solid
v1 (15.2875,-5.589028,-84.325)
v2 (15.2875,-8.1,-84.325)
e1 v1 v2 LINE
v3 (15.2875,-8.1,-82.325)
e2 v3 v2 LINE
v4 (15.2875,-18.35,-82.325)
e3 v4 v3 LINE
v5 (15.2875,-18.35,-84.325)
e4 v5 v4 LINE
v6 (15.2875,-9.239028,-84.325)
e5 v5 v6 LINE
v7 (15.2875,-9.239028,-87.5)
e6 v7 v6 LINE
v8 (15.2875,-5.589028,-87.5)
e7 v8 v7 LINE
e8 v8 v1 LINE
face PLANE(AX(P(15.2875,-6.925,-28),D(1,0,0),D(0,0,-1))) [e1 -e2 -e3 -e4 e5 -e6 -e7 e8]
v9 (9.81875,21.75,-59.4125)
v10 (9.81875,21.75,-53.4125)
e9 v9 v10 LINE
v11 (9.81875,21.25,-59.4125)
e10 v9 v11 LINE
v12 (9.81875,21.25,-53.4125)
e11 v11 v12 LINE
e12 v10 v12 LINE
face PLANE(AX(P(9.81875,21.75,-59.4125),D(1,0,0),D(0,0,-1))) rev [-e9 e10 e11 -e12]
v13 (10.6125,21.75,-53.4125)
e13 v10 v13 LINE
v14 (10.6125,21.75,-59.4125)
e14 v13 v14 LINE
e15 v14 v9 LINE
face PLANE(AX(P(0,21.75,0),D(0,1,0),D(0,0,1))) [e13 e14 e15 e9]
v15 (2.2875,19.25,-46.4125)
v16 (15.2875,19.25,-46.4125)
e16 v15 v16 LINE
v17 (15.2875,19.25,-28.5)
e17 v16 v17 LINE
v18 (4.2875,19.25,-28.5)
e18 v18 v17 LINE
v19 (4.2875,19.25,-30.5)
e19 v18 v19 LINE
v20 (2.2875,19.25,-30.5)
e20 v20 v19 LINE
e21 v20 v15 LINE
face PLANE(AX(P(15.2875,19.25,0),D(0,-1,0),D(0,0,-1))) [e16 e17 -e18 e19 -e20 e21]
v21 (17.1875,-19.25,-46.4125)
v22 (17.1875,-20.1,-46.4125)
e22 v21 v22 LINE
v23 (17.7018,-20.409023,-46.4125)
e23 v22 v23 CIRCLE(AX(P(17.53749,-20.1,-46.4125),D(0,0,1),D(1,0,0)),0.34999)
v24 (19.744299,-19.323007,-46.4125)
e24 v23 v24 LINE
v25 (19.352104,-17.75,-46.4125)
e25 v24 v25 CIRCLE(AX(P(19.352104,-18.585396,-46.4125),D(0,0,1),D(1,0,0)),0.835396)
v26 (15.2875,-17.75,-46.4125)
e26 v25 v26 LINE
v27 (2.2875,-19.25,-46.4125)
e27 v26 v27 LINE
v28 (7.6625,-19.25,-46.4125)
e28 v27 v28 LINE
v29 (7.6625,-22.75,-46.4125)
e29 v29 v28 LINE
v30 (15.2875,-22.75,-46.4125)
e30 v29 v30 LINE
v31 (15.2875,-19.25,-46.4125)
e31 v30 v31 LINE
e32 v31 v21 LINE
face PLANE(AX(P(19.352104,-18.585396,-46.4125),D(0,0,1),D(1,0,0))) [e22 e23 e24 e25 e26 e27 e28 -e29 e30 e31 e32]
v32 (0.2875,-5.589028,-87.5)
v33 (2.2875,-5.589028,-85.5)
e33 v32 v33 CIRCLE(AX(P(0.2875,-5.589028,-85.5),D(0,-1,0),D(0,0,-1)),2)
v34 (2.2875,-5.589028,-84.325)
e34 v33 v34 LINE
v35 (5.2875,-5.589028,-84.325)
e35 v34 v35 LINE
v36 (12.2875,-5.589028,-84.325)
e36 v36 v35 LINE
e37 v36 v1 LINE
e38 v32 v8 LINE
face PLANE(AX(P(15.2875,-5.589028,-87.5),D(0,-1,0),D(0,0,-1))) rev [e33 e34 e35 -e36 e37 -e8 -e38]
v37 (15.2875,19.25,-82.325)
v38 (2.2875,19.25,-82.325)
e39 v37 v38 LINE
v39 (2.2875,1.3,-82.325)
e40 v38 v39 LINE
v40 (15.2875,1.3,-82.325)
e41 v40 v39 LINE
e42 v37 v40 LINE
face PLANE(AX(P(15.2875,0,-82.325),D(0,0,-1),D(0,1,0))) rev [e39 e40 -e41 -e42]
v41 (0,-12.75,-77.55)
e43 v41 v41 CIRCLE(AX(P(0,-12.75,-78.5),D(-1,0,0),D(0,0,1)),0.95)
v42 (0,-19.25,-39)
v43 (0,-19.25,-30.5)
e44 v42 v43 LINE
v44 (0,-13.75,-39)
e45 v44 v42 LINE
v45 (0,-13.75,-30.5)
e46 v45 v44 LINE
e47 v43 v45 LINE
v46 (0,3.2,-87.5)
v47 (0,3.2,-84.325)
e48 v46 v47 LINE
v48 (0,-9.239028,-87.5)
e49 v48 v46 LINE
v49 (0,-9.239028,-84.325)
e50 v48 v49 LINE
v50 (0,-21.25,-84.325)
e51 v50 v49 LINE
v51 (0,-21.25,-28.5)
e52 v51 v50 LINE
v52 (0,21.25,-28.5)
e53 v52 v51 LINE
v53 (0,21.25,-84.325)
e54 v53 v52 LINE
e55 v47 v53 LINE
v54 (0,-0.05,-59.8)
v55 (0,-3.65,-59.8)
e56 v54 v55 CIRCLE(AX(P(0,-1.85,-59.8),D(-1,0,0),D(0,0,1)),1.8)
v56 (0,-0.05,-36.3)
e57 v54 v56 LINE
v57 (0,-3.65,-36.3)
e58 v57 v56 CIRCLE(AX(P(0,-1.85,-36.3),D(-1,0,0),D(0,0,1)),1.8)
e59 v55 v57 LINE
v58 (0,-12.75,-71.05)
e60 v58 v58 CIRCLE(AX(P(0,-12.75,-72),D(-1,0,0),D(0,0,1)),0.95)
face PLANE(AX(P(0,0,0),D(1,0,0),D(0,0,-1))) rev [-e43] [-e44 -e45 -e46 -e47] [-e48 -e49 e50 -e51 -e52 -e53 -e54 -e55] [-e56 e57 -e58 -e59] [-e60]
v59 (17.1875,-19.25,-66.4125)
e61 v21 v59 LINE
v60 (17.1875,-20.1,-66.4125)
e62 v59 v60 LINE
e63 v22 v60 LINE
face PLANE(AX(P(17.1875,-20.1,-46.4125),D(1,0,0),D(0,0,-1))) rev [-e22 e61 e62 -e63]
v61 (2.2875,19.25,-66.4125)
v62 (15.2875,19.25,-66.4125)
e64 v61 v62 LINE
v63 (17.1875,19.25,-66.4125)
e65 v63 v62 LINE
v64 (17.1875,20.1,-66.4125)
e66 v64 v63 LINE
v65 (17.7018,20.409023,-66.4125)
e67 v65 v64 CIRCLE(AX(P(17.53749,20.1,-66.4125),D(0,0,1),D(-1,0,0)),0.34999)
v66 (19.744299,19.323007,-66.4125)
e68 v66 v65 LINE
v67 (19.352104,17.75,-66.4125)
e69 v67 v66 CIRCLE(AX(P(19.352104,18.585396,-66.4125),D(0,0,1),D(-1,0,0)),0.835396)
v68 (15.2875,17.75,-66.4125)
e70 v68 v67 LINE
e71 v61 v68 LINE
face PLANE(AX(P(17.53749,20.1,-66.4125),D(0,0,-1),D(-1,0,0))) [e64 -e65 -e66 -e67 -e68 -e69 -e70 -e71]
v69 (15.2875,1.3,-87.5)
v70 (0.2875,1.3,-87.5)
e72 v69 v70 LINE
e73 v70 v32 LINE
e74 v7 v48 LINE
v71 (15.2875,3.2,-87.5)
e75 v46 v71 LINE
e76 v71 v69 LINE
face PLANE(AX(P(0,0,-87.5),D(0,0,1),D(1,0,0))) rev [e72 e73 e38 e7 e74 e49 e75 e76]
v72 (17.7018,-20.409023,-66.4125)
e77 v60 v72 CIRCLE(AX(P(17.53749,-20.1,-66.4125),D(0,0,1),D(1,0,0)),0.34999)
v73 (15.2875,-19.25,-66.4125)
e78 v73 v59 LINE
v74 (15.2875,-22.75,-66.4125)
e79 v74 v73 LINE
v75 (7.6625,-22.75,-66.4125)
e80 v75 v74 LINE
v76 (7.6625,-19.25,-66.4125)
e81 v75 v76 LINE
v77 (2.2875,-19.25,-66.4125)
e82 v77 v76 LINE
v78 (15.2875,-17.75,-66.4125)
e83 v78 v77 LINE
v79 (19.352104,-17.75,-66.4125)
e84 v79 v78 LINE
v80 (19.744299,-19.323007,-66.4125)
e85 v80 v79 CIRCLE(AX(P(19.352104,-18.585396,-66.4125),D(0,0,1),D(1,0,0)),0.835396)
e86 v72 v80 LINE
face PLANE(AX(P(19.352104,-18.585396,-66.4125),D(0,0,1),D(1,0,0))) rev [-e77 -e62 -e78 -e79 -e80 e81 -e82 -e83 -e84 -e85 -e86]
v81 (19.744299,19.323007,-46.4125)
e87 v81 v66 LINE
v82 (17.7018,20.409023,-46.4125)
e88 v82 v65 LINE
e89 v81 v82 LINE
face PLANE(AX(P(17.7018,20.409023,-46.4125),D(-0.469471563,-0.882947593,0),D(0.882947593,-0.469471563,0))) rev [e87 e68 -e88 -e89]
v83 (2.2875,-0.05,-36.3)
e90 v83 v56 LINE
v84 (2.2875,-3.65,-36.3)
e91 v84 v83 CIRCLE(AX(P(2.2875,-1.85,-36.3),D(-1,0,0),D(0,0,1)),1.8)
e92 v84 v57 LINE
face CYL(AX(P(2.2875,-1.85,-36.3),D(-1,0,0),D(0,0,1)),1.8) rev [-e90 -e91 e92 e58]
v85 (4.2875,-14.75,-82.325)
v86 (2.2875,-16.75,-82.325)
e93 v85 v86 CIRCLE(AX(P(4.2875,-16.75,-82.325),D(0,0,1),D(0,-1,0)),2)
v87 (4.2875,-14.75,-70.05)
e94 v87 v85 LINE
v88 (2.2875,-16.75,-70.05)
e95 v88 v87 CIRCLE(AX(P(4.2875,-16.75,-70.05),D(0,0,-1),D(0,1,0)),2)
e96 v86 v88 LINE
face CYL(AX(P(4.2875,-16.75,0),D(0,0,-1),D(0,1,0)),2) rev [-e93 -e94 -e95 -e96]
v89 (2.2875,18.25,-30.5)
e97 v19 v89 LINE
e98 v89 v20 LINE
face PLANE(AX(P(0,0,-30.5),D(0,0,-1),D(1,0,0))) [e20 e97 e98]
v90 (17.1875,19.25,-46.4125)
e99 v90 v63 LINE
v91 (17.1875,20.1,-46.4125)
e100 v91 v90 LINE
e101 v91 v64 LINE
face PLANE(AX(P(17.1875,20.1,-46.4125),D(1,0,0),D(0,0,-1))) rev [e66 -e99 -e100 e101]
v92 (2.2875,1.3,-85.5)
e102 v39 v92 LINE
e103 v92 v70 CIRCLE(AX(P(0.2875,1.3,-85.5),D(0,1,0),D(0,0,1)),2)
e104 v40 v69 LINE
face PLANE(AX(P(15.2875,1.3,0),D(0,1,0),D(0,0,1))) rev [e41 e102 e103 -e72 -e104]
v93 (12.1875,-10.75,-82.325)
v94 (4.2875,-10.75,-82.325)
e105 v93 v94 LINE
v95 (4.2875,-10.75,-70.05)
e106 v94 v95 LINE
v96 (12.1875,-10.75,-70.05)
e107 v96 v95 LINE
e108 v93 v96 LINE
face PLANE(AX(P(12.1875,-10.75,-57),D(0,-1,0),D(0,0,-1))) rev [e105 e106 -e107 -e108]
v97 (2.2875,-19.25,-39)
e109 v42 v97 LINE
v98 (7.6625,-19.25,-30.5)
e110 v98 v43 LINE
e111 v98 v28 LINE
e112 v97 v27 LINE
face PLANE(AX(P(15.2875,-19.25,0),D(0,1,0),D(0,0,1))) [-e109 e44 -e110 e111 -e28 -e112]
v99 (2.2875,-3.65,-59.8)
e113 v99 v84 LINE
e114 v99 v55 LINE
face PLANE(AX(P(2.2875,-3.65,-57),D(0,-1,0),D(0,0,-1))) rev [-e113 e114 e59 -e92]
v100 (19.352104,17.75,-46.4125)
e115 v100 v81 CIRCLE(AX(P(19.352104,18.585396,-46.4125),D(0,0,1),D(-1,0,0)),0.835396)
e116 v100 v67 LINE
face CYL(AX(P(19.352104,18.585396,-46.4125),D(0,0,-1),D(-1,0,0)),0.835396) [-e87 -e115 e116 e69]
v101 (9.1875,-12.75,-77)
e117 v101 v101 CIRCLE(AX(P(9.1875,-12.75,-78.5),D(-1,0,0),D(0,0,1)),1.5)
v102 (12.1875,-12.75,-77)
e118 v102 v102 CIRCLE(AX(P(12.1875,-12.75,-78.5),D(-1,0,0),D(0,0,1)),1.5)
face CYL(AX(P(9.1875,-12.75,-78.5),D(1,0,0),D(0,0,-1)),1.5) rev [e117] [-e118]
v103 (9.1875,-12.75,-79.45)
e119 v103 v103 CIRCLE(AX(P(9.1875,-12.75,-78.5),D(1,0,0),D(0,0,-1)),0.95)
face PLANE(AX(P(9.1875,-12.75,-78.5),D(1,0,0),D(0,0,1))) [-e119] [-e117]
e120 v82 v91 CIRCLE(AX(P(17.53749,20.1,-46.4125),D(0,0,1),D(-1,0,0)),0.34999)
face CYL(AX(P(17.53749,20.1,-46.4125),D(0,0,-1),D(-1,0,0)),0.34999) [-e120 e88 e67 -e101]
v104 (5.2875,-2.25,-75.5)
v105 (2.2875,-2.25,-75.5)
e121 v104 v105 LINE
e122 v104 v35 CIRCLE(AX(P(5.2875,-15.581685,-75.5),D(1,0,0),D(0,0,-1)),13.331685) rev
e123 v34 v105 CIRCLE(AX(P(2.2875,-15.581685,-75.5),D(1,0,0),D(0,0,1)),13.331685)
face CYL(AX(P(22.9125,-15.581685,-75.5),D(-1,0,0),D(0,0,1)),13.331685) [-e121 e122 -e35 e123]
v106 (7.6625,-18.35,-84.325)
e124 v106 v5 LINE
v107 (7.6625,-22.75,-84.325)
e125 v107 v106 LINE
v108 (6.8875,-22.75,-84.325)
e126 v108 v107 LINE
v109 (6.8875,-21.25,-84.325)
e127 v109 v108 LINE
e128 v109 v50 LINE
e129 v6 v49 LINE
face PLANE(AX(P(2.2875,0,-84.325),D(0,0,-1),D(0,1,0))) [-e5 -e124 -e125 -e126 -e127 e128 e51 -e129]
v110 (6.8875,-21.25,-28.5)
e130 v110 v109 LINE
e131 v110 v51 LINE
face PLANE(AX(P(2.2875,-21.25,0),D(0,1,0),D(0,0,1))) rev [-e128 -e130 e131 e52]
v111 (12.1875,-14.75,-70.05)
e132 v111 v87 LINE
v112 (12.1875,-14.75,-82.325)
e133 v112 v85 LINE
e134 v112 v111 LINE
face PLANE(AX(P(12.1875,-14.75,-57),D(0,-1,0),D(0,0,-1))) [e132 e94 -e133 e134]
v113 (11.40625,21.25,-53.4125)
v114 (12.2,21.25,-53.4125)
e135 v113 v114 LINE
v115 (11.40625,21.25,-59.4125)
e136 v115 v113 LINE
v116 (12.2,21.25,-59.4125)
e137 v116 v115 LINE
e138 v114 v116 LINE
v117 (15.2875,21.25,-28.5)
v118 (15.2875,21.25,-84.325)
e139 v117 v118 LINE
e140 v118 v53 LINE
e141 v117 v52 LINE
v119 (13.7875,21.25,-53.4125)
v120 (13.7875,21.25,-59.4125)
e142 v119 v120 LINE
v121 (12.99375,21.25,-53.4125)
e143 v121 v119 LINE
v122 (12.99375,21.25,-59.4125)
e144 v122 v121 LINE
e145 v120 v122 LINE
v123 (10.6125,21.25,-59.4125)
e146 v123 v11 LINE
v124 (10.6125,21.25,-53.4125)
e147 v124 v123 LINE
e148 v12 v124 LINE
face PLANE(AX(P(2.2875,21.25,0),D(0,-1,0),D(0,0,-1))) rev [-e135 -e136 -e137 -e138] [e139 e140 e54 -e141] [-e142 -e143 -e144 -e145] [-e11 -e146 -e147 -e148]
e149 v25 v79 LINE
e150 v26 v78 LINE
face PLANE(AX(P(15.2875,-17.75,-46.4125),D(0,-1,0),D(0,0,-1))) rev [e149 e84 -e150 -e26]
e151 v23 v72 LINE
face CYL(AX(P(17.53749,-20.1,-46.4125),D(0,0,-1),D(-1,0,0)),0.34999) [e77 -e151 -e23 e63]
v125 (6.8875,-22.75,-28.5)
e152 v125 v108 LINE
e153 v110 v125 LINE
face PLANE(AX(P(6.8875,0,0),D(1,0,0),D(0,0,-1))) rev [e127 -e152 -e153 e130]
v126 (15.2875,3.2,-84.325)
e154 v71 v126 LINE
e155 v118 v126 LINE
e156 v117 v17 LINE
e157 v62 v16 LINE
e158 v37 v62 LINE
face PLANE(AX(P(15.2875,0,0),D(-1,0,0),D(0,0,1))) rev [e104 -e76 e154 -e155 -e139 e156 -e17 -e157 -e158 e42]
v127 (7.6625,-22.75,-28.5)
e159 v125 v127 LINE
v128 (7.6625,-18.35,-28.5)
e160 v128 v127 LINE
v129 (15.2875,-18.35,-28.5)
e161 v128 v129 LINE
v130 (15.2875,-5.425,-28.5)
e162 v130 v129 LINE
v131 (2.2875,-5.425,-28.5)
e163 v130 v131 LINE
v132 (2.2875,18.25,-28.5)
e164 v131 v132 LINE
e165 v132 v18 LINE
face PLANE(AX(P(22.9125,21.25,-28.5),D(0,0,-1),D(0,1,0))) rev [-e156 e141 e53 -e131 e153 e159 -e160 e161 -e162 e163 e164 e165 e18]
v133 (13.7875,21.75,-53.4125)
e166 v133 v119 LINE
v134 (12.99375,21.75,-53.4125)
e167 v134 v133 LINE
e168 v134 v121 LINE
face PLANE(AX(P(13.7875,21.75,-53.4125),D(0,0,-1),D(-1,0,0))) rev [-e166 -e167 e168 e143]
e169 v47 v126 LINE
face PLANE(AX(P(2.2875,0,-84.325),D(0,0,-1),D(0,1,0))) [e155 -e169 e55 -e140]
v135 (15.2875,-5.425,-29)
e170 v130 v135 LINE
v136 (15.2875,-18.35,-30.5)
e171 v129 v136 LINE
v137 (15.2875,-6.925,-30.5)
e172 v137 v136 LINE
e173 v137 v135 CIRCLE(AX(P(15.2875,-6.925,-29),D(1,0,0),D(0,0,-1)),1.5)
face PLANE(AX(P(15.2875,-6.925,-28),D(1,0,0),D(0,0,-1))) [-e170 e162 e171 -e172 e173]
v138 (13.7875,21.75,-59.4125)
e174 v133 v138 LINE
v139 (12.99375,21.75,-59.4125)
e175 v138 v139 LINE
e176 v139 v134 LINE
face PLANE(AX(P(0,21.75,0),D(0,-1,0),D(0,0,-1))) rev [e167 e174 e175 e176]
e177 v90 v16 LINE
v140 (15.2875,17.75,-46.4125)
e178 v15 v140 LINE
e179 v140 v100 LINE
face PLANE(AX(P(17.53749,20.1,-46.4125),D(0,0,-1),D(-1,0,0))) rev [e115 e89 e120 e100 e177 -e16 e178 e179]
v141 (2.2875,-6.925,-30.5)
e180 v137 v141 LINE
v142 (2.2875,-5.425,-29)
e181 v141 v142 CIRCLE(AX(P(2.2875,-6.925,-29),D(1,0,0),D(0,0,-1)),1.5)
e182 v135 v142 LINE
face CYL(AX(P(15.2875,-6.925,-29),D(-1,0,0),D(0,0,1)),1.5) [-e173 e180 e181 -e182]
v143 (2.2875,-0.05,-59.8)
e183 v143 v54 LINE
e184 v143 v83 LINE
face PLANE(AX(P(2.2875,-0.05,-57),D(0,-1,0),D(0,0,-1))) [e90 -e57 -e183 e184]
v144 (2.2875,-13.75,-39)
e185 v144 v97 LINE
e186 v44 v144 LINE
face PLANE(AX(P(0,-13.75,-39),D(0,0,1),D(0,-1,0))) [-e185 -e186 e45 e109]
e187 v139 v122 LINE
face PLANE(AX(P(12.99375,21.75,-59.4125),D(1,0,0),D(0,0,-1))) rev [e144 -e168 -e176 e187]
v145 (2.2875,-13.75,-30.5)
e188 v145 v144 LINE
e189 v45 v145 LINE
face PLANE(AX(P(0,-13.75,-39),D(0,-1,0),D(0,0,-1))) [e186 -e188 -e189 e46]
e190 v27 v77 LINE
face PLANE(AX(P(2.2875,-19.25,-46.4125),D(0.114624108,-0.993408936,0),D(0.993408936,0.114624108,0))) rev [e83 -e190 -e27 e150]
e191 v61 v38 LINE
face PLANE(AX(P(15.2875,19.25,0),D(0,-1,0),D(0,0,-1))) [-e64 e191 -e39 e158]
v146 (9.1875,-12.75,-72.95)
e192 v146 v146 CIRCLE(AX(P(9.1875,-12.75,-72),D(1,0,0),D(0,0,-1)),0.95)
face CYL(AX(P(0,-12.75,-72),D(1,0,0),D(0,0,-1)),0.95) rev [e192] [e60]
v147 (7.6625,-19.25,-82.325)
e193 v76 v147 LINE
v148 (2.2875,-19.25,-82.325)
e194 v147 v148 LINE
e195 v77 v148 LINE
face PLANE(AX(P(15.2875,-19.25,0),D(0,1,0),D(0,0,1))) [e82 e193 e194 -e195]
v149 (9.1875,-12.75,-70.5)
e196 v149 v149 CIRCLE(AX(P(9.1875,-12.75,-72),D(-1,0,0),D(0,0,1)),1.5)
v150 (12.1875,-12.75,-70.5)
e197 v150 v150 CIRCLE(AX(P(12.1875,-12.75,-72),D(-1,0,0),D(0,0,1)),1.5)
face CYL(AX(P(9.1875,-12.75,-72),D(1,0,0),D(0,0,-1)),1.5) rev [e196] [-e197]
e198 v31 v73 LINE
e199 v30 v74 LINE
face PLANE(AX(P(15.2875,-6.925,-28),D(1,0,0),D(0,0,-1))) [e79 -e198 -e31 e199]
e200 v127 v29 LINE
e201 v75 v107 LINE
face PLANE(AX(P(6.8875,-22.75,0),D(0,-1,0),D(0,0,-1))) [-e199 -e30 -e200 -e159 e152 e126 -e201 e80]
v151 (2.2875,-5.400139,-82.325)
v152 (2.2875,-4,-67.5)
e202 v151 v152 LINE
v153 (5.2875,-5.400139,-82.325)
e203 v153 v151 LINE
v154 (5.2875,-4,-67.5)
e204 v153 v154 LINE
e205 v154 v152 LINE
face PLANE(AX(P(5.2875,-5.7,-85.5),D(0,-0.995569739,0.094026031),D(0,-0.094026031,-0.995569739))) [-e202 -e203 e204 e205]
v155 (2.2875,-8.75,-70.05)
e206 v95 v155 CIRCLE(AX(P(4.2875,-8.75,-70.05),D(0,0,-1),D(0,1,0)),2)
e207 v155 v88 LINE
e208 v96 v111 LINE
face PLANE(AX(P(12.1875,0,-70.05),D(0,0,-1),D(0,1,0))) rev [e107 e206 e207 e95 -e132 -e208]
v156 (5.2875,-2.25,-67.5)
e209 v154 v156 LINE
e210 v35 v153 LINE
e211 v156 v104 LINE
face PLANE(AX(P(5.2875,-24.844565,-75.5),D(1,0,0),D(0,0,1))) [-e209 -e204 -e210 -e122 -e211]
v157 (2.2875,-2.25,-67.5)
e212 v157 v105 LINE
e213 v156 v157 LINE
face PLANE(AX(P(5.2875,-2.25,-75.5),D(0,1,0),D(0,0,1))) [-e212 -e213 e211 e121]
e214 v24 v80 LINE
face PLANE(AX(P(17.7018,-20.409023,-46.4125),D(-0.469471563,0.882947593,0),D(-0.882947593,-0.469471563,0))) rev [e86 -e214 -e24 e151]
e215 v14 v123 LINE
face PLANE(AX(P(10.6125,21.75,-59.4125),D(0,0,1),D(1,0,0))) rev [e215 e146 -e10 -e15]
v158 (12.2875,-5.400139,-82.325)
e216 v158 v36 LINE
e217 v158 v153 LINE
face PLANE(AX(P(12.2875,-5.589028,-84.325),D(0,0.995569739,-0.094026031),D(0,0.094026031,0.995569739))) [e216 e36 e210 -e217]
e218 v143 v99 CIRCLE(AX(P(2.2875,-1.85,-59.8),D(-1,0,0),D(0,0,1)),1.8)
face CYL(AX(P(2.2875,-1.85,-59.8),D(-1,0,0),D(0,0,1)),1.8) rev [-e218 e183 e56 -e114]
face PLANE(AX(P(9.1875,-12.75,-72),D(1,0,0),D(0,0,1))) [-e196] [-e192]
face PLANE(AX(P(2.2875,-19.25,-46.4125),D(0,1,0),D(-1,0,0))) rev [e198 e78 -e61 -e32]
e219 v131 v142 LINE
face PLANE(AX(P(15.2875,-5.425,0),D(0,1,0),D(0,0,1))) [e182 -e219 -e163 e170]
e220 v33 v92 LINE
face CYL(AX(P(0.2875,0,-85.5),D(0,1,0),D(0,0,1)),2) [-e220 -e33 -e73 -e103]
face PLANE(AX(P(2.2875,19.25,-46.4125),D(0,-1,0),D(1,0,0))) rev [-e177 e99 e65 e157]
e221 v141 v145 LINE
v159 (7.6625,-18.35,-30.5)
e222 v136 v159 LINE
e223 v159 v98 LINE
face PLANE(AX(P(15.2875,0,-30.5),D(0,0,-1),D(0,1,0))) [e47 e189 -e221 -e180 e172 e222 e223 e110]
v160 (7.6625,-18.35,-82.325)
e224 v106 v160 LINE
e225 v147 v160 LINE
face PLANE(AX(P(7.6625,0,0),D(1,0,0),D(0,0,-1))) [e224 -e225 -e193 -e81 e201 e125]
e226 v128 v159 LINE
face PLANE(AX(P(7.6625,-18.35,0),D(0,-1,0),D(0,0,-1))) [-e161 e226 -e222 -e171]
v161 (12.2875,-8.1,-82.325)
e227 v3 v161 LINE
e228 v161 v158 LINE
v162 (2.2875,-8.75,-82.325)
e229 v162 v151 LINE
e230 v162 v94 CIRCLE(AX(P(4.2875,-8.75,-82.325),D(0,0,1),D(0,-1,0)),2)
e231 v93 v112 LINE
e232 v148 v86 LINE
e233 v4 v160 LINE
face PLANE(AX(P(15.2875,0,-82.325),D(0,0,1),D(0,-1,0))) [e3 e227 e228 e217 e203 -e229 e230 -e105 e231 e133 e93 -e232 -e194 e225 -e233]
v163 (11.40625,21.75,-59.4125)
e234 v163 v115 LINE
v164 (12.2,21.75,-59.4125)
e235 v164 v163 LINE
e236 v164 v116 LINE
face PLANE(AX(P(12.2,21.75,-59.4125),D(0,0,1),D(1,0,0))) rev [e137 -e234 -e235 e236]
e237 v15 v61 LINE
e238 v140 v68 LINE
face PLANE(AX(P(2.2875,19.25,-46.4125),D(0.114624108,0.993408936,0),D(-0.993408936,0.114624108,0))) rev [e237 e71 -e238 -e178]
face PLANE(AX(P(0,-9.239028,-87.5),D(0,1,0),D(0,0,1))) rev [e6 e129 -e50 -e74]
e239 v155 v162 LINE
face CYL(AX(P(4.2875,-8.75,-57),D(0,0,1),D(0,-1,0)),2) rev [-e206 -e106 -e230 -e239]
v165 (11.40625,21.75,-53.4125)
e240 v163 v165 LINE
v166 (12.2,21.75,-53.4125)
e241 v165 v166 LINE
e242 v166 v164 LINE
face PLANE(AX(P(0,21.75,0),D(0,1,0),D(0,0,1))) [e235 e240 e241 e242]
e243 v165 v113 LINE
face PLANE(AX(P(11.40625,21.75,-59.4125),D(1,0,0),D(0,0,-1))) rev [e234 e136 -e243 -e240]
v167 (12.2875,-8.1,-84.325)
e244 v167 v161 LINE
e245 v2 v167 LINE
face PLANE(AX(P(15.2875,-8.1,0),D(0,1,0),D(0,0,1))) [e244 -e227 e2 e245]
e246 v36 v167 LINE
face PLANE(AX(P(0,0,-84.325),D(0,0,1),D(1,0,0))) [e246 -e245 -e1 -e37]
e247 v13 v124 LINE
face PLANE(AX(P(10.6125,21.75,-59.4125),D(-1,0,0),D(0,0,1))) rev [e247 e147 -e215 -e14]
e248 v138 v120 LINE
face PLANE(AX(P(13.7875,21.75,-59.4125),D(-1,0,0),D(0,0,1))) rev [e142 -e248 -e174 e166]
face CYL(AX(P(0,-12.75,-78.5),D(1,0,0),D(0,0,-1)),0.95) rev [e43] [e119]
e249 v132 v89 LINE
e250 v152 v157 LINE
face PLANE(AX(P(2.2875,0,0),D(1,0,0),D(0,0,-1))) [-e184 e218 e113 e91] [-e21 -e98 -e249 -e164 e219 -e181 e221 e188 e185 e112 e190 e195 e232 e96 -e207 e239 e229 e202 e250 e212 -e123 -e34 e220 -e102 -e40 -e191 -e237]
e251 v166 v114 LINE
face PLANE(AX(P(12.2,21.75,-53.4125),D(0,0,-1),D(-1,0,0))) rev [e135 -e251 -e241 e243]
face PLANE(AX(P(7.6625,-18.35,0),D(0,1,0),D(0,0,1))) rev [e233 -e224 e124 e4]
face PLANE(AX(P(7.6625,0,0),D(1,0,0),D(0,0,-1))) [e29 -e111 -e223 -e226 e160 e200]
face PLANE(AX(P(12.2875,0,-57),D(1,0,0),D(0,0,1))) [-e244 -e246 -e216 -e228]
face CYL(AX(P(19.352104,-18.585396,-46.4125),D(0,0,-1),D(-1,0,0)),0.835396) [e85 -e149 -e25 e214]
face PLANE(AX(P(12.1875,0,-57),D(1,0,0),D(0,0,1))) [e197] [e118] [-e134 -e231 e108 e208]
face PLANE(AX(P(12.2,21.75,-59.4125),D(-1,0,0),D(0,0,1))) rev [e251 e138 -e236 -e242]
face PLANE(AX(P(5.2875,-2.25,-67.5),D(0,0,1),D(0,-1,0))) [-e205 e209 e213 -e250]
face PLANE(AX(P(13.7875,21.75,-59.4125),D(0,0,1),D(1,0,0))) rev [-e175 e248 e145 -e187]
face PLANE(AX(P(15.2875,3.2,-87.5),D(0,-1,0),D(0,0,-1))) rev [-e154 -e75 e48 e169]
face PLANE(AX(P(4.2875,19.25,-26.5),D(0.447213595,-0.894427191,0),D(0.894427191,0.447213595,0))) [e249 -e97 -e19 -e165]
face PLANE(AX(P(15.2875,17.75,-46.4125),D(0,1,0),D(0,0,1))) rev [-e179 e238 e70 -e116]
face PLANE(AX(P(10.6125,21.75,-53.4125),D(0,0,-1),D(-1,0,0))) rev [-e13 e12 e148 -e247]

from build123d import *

# Parameters (mm, degrees)
MAIN_EXTRUDE_DEPTH            = 2.2875
WALLS_START                   = 2.2875
WALLS_DEPTH                   = 13
CORNER_SUPPORT_DEPTH          = 2
SKETCH2_R                     = 0.95
SKETCH2_W                     = 2.4
SKETCH2_H                     = 4
SKETCH2_W_2                   = 1
SWITCH_SPACER_DEPTH           = 9.9
ARM_SUPPORT_EXTRUDE_DEPTH     = 3
ARM_SUPPORT_CURVE_DEPTH       = 40.380356778
FILLET4_R                     = 2
FILLET3_R                     = 2
SKETCH2_5_R                   = 0.95
SWITCH_MOUNT_HOLES_DEPTH      = 40.380356889
SKETCH35_R                    = 1.5
SWITCH_MOUNT_EXIT_HOLES_DEPTH = 3
SKETCH4_W                     = 8.5
SKETCH4_H                     = 5.5
WIRE_HOLE_DEPTH               = 40.380356889
SKETCH25_W                    = 6
SKETCH25_H                    = 1.35
FEMALE_SNAP_DEPTH             = 10.125
SKETCH5_W                     = 30
SKETCH5_H                     = 12.75
SERVO_HOLE_DEPTH              = 40.380356889
MAGNET_EXTRUDE_1_DEPTH        = 7.625
MAGNET_EXTRUDE_1_DEPTH_BACK   = 8.2
SKETCH30_W                    = 15.7875
SKETCH30_H                    = 0.9
SKETCH30_W_2                  = 17.7875
SKETCH30_H_2                  = 1.5
SKETCH29_R                    = 7.7
MAGNET_HOLE_DEPTH             = 2.1
SKETCH31_R                    = 5.5
MAGNET_THRU_HOLE_DEPTH        = 58.632218961
SKETCH39_W                    = 3.175
SKETCH39_H                    = 12.55
CUT_EXTRUDE1_DEPTH            = 45.416158798
CUT_EXTRUDE2_DEPTH            = 42.895144408
BOSS_EXTRUDE2_DEPTH           = 10
MIRROR1_OUTLINE_W             = 42.5
MIRROR1_OUTLINE_H             = 55.825
MIRROR1_OUTLINE_W_2           = 5.5
MIRROR1_OUTLINE_H_2           = 8.5
MIRROR1_OUTLINE_R             = 0.95
MIRROR1_DEPTH                 = 2.2875
MIRROR1_START                 = 2.2875
MIRROR1_2_DEPTH               = 13
MIRROR1_3_OUTLINE_W           = 4
MIRROR1_3_OUTLINE_H           = 12.275
MIRROR1_3_OUTLINE_R           = 1.5
MIRROR1_3_DEPTH               = 9.9
MIRROR1_4_OUTLINE_R           = 1.5
MIRROR1_4_OUTLINE_R_2         = 0.95
MIRROR1_4_DEPTH               = 3
MIRROR1_START_2               = 5.2875
MIRROR1_5_OUTLINE_R           = 1.5
MIRROR1_5_OUTLINE_R_2         = 0.95
MIRROR1_5_DEPTH               = 3.9
MIRROR1_START_3               = 12.1875
MIRROR1_6_DEPTH               = 0.1
MIRROR1_START_4               = -84.325
MIRROR1_7_DEPTH               = 14.275
MIRROR1_START_5               = -30.5
MIRROR1_8_DEPTH               = 2
SKETCH6_W                     = 59
SKETCH6_H                     = 44
MIRROR_CUT_DEPTH              = 91.295353043
MALE_SNAP_DEPTH               = 10
SKETCH34_W                    = 55.825
SKETCH34_H                    = 1.5
MAGNET_EXTRUDE_DEPTH          = 8.4
SKETCH34_5_W                  = 15.9125
SKETCH34_5_H                  = 0.9
SKETCH34_5_W_2                = 17.9125
SKETCH34_5_H_2                = 1.5
MAGNET_BOTTOM_CUT_DEPTH       = 7.625
SKETCH36_W                    = 0.79375
SKETCH36_H                    = 6
BOSS_EXTRUDE1_DEPTH           = 0.5
BOSS_EXTRUDE5_DEPTH           = 3.175
FILLET7_R                     = 2


with BuildPart() as part:
    # Sketch1 → Main Extrude (new body)
    with BuildSketch(Plane(origin=(0, 0, 0), x_dir=(0, 0, -1), z_dir=(1, 0, 0))):
        Polygon((-30.5, -9.35), (-27.325, -9.35), (-27.325, -21.25), (28.5, -21.25), (28.5, 21.25), (-27.325, 21.25), (-27.325, 3.2), (-30.5, 3.2), align=None)
        with BuildLine():
            Line((20.7, -3.65), (-2.8, -3.65))
            ThreePointArc((-2.8, -3.65), (-4.6, -1.85), (-2.8, -0.05))
            Line((-2.8, -0.05), (20.7, -0.05))
            ThreePointArc((20.7, -0.05), (22.5, -1.85), (20.7, -3.65))
        make_face(mode=Mode.SUBTRACT)
    extrude(amount=MAIN_EXTRUDE_DEPTH)

    # Sketch1<3> → Walls (add)
    with BuildSketch(Plane(origin=(0, 0, 0), x_dir=(0, 0, -1), z_dir=(1, 0, 0)).offset(WALLS_START)):
        Polygon((-25.325, 19.25), (28.5, 19.25), (28.5, 21.25), (-27.325, 21.25), (-27.325, 3.2), (-30.5, 3.2), (-30.5, 1.3), (-25.325, 1.3), align=None)
        with BuildLine():
            Line((28.5, -5.425), (28, -5.425))
            ThreePointArc((28, -5.425), (26.939339828, -5.864339828), (26.5, -6.925))
            Line((26.5, -6.925), (26.5, -19.25))
            Line((26.5, -19.25), (-25.325, -19.25))
            Line((-25.325, -19.25), (-25.325, -8.1))
            Line((-25.325, -8.1), (-28.5, -8.1))
            Line((-28.5, -8.1), (-28.5, -4.45))
            Line((-28.5, -4.45), (-30.5, -4.45))
            Line((-30.5, -4.45), (-30.5, -9.35))
            Line((-30.5, -9.35), (-27.325, -9.35))
            Line((-27.325, -9.35), (-27.325, -21.25))
            Line((-27.325, -21.25), (28.5, -21.25))
            Line((28.5, -21.25), (28.5, -5.425))
        make_face()
    extrude(amount=WALLS_DEPTH)

    # Sketch22 → Corner Support (add)
    with BuildSketch(Plane(origin=(0, 0, -28.5), x_dir=(-1, 0, 0), z_dir=(0, 0, -1))):
        Polygon((-4.2875, 19.25), (-2.2875, 18.25), (-2.2875, 19.25), align=None)
    extrude(amount=-CORNER_SUPPORT_DEPTH)

    # Sketch2 → Switch Spacer (add)
    # profile 1 of 7: a face of its own
    with BuildSketch(Plane(origin=(2.2875, 0, 0), x_dir=(0, 0, -1), z_dir=(1, 0, 0))):
        Polygon((-14.05, -10.75), (-17.05, -10.75), (-17.05, -14.75), (-14.05, -14.75), (-14.05, -12.75), align=None)
        with Locations((-15, -12.75)):
            Circle(SKETCH2_R, mode=Mode.SUBTRACT)
    # profile 2 of 7: a face of its own
    with BuildSketch(Plane(origin=(2.2875, 0, 0), x_dir=(0, 0, -1), z_dir=(1, 0, 0))):
        with Locations((-15, -12.75)):
            Circle(SKETCH2_R)
    # profile 3 of 7: a face of its own
    with BuildSketch(Plane(origin=(2.2875, 0, 0), x_dir=(0, 0, -1), z_dir=(1, 0, 0))):
        Polygon((-19.45, -10.75), (-22.45, -10.75), (-22.45, -12.75), (-22.45, -14.75), (-19.45, -14.75), align=None)
        with BuildLine():
            ThreePointArc((-20.55, -12.75), (-21.5, -13.7), (-22.45, -12.75))
            ThreePointArc((-22.45, -12.75), (-21.5, -11.8), (-20.55, -12.75))
        make_face(mode=Mode.SUBTRACT)
    # profile 4 of 7: a face of its own
    with BuildSketch(Plane(origin=(2.2875, 0, 0), x_dir=(0, 0, -1), z_dir=(1, 0, 0))):
        with Locations((-21.5, -12.75)):
            Circle(SKETCH2_R)
    # profile 5 of 7: a face of its own
    with BuildSketch(Plane(origin=(2.2875, 0, 0), x_dir=(0, 0, -1), z_dir=(1, 0, 0))):
        Polygon((-22.45, -12.75), (-22.45, -10.75), (-25.325, -10.75), (-25.325, -14.75), (-22.45, -14.75), align=None)
    # profile 6 of 7: a face of its own
    with BuildSketch(Plane(origin=(2.2875, 0, 0), x_dir=(0, 0, -1), z_dir=(1, 0, 0))):
        with Locations((-18.25, -12.75)):
            Rectangle(SKETCH2_W, SKETCH2_H)
    # profile 7 of 7: a face of its own
    with BuildSketch(Plane(origin=(2.2875, 0, 0), x_dir=(0, 0, -1), z_dir=(1, 0, 0))):
        with Locations((-13.55, -12.75)):
            Rectangle(SKETCH2_W_2, SKETCH2_H)
    extrude(amount=SWITCH_SPACER_DEPTH)

    # Sketch3 → Arm Support Extrude (add)
    with BuildSketch(Plane(origin=(2.2875, 0, 0), x_dir=(0, 0, -1), z_dir=(1, 0, 0))):
        with BuildLine():
            Line((-18.5, -2.25), (-10.5, -2.25))
            Line((-10.5, -2.25), (-10.5, -4))
            Line((-10.5, -4), (-28.5, -5.7))
            Line((-28.5, -5.7), (-30.5, -5.7))
            ThreePointArc((-30.5, -5.7), (-24.743046131, -3.129622151), (-18.5, -2.25))
        make_face()
    extrude(amount=ARM_SUPPORT_EXTRUDE_DEPTH)

    # Sketch7 → Arm Support Curve (cut, through all)
    with BuildSketch(Plane(origin=(2.2875, 0, 0), x_dir=(0, 0, -1), z_dir=(1, 0, 0))):
        with BuildLine():
            Line((-28.5, -4.583410824), (-28.5, -4.45))
            Line((-28.5, -4.45), (-30.5, -4.45))
            Line((-30.5, -4.45), (-30.5, -5.7))
            ThreePointArc((-30.5, -5.7), (-29.627655409, -5.180138898), (-28.73283292, -4.7))
            ThreePointArc((-28.73283292, -4.7), (-28.616584416, -4.641369997), (-28.5, -4.583410824))
        make_face()
    extrude(amount=ARM_SUPPORT_CURVE_DEPTH, mode=Mode.SUBTRACT)

    # Fillet4
    fillet4_edges = [part.edges().sort_by_distance(p)[0] for p in [
        (2.2875, -2.2, 30.5),
    ]]
    fillet(fillet4_edges, radius=FILLET4_R)

    # Fillet3
    fillet3_edges = [part.edges().sort_by_distance(p)[0] for p in [
        (2.2875, -14.75, 19.1875),
        (2.2875, -10.75, 19.1875),
    ]]
    fillet(fillet3_edges, radius=FILLET3_R)

    # Sketch2<5> → Switch Mount Holes (cut, symmetric)
    with BuildSketch(Plane(origin=(2.2875, 0, 0), x_dir=(0, 0, -1), z_dir=(1, 0, 0))):
        with Locations((-21.5, -12.75)):
            Circle(SKETCH2_5_R)
        with Locations((-15, -12.75)):
            Circle(SKETCH2_5_R)
    extrude(amount=SWITCH_MOUNT_HOLES_DEPTH, both=True, mode=Mode.SUBTRACT)

    # Sketch35 → Switch Mount Exit Holes (cut)
    with BuildSketch(Plane(origin=(12.1875, 0, 0), x_dir=(0, 0, -1), z_dir=(1, 0, 0))):
        with Locations((-21.5, -12.75)):
            Circle(SKETCH35_R)
        with Locations((-15, -12.75)):
            Circle(SKETCH35_R)
    extrude(amount=-SWITCH_MOUNT_EXIT_HOLES_DEPTH, mode=Mode.SUBTRACT)

    # Sketch4 → Wire Hole (cut, through all)
    with BuildSketch(Plane(origin=(2.2875, 0, 0), x_dir=(0, 0, -1), z_dir=(1, 0, 0))):
        with Locations((22.25, -16.5)):
            Rectangle(SKETCH4_W, SKETCH4_H)
    extrude(amount=-WIRE_HOLE_DEPTH, mode=Mode.SUBTRACT)

    # Sketch25 → Female Snap (cut, symmetric)
    with BuildSketch(Plane(origin=(0, 0, -0.5875), x_dir=(-1, 0, 0), z_dir=(0, 0, -1))):
        with Locations((-11.0375, -19.925)):
            Rectangle(SKETCH25_W, SKETCH25_H)
        Polygon((-15.2875, -19.25), (-15.2875, -19.91463679), (-14.0375, -19.25), align=None)
        with Locations((-11.0375, 19.925)):
            Rectangle(SKETCH25_W, SKETCH25_H)
        Polygon((-15.2875, 19.91463679), (-15.2875, 19.25), (-14.0375, 19.25), align=None)
    extrude(amount=FEMALE_SNAP_DEPTH, both=True, mode=Mode.SUBTRACT)

    # Sketch5 → Servo Hole (cut, through all)
    with BuildSketch(Plane(origin=(2.2875, 0, 0), x_dir=(0, 0, -1), z_dir=(1, 0, 0))):
        with Locations((7.35, 9.675)):
            Rectangle(SKETCH5_W, SKETCH5_H)
        with BuildLine():
            Line((-8.75, 10.675), (-8.75, 8.675))
            ThreePointArc((-8.75, 8.675), (-10.3, 7.125), (-11.85, 8.675))
            Line((-11.85, 8.675), (-11.85, 10.675))
            ThreePointArc((-11.85, 10.675), (-10.3, 12.225), (-8.75, 10.675))
        make_face()
        with BuildLine():
            Line((26.55, 10.675), (26.55, 8.675))
            ThreePointArc((26.55, 8.675), (25, 7.125), (23.45, 8.675))
            Line((23.45, 8.675), (23.45, 10.675))
            ThreePointArc((23.45, 10.675), (25, 12.225), (26.55, 10.675))
        make_face()
    extrude(amount=-SERVO_HOLE_DEPTH, mode=Mode.SUBTRACT)

    # Sketch30 → Magnet Extrude 1 (add, two sides: drawn at the far end of the back side and taken through both)
    with BuildSketch(Plane(origin=(15.2875, 0, 0), x_dir=(0, 0, -1), z_dir=(1, 0, 0)).offset(-MAGNET_EXTRUDE_1_DEPTH_BACK)):
        Polygon((-27.325, -18.35), (-27.325, -21.25), (-9.5375, -21.25), (-9.5375, -19.91463679), (-9.5375, -19.25), (-25.325, -19.25), (-25.325, -18.35), align=None)
        with Locations((-17.43125, -18.8)):
            Rectangle(SKETCH30_W, SKETCH30_H)
        with Locations((19.60625, -22)):
            Rectangle(SKETCH30_W_2, SKETCH30_H_2)
        Polygon((10.7125, -19.91463679), (10.7125, -21.25), (28.5, -21.25), (28.5, -18.35), (26.5, -18.35), (26.5, -19.25), (10.7125, -19.25), align=None)
        with Locations((-18.43125, -22)):
            Rectangle(SKETCH30_W_2, SKETCH30_H_2)
        with Locations((18.60625, -18.8)):
            Rectangle(SKETCH30_W, SKETCH30_H)
    extrude(amount=MAGNET_EXTRUDE_1_DEPTH + MAGNET_EXTRUDE_1_DEPTH_BACK)

    # Sketch29 → Magnet Hole (cut)
    with BuildSketch(Plane(origin=(0, -21.95, 0), x_dir=(1, 0, 0), z_dir=(0, 1, 0))):
        with Locations((15.2875, -17.625)):
            Circle(SKETCH29_R)
        with BuildLine():
            ThreePointArc((22.9125, -18.697089082), (20.338980677, -23.436414885), (15.2875, -25.325))
            Line((15.2875, -25.325), (22.9125, -25.325))
            Line((22.9125, -25.325), (22.9125, -18.697089082))
        make_face()
        with BuildLine():
            Line((22.9125, -9.925), (15.2875, -9.925))
            ThreePointArc((15.2875, -9.925), (20.338980677, -11.813585115), (22.9125, -16.552910918))
            Line((22.9125, -16.552910918), (22.9125, -9.925))
        make_face()
        with Locations((15.2875, 19.4)):
            Circle(SKETCH29_R)
        with BuildLine():
            ThreePointArc((22.9125, 18.327910918), (20.338980677, 13.588585115), (15.2875, 11.7))
            Line((15.2875, 11.7), (22.9125, 11.7))
            Line((22.9125, 11.7), (22.9125, 18.327910918))
        make_face()
        with BuildLine():
            Line((22.9125, 27.1), (15.2875, 27.1))
            ThreePointArc((15.2875, 27.1), (20.338980677, 25.211414885), (22.9125, 20.472089082))
            Line((22.9125, 20.472089082), (22.9125, 27.1))
        make_face()
        with BuildLine():
            ThreePointArc((22.9875, -17.625), (22.968727116, -17.087645368), (22.9125, -16.552910918))
            Line((22.9125, -16.552910918), (22.9125, -18.697089082))
            ThreePointArc((22.9125, -18.697089082), (22.968727116, -18.162354632), (22.9875, -17.625))
        make_face()
        with BuildLine():
            Line((22.9125, 20.472089082), (22.9125, 18.327910918))
            ThreePointArc((22.9125, 18.327910918), (22.968727116, 18.862645368), (22.9875, 19.4))
            ThreePointArc((22.9875, 19.4), (22.968727116, 19.937354632), (22.9125, 20.472089082))
        make_face()
    extrude(amount=MAGNET_HOLE_DEPTH, mode=Mode.SUBTRACT)

    # Sketch31 → Magnet Thru Hole (cut, through all)
    with BuildSketch(Plane.XZ.offset(21.95)):
        with Locations((15.2875, 17.625)):
            Circle(SKETCH31_R)
        with BuildLine():
            Line((22.9125, 23.125), (15.2875, 23.125))
            ThreePointArc((15.2875, 23.125), (19.176587297, 21.514087297), (20.7875, 17.625))
            ThreePointArc((20.7875, 17.625), (19.176587297, 13.735912703), (15.2875, 12.125))
            Line((15.2875, 12.125), (22.9125, 12.125))
            Line((22.9125, 12.125), (22.9125, 23.125))
        make_face()
        with Locations((15.2875, -19.4)):
            Circle(SKETCH31_R)
        with BuildLine():
            Line((22.9125, -13.9), (15.2875, -13.9))
            ThreePointArc((15.2875, -13.9), (19.176587297, -15.510912703), (20.7875, -19.4))
            ThreePointArc((20.7875, -19.4), (19.176587297, -23.289087297), (15.2875, -24.9))
            Line((15.2875, -24.9), (22.9125, -24.9))
            Line((22.9125, -24.9), (22.9125, -13.9))
        make_face()
    extrude(amount=MAGNET_THRU_HOLE_DEPTH, mode=Mode.SUBTRACT)

    # Sketch39 → Cut-Extrude1 (cut, through all)
    with BuildSketch(Plane.ZY):
        with Locations((28.9125, -3.075)):
            Rectangle(SKETCH39_W, SKETCH39_H)
    extrude(amount=-CUT_EXTRUDE1_DEPTH, mode=Mode.SUBTRACT)

    # Sketch40 → Cut-Extrude2 (cut, through all)
    with BuildSketch(Plane(origin=(2.2875, 0, 0), x_dir=(0, 0, -1), z_dir=(1, 0, 0))):
        with BuildLine():
            Line((-27.325, -5.589027778), (-27.325, -4.044715402))
            ThreePointArc((-27.325, -4.044715402), (-23.002822125, -2.703224466), (-18.5, -2.25))
            ThreePointArc((-18.5, -2.25), (-23.217778383, -3.112667731), (-27.325, -5.589027778))
        make_face()
    extrude(amount=CUT_EXTRUDE2_DEPTH, mode=Mode.SUBTRACT)

    # Sketch41 → Boss-Extrude2 (add)
    with BuildSketch(Plane(origin=(2.2875, 0, 0), x_dir=(0, 0, -1), z_dir=(1, 0, 0))):
        Polygon((-25.325, -8.1), (-27.325, -8.1), (-27.325, -5.589027778), (-25.325, -5.400138889), align=None)
    extrude(amount=BOSS_EXTRUDE2_DEPTH)

    # Mirror1: read off the stored shape, not the designer's step
    # Mirror1 outline → Mirror1 (add)
    with BuildSketch(Plane.YZ):
        with Locations((0, -56.4125)):
            Rectangle(MIRROR1_OUTLINE_W, MIRROR1_OUTLINE_H)
        with Locations((-16.5, -34.75)):
            Rectangle(MIRROR1_OUTLINE_W_2, MIRROR1_OUTLINE_H_2, mode=Mode.SUBTRACT)
        with BuildLine():
            ThreePointArc((-0.05, -59.8), (-1.85, -61.6), (-3.65, -59.8))
            Line((-3.65, -59.8), (-3.65, -36.3))
            ThreePointArc((-3.65, -36.3), (-1.85, -34.5), (-0.05, -36.3))
            Line((-0.05, -36.3), (-0.05, -59.8))
        make_face(mode=Mode.SUBTRACT)
        with Locations((-12.75, -72)):
            Circle(MIRROR1_OUTLINE_R, mode=Mode.SUBTRACT)
        with Locations((-12.75, -78.5)):
            Circle(MIRROR1_OUTLINE_R, mode=Mode.SUBTRACT)
    extrude(amount=MIRROR1_DEPTH)

    # Mirror1 2 outline → Mirror1 2 (add)
    with BuildSketch(Plane.YZ.offset(MIRROR1_START)):
        with BuildLine():
            Line((-21.25, -28.5), (-21.25, -84.325))
            Line((-21.25, -84.325), (-8.1, -84.325))
            Line((-8.1, -84.325), (-8.1, -82.325))
            Line((-8.1, -82.325), (-19.25, -82.325))
            Line((-19.25, -82.325), (-19.25, -30.5))
            Line((-19.25, -30.5), (-6.925, -30.5))
            ThreePointArc((-6.925, -30.5), (-5.864339828, -30.060660172), (-5.425, -29))
            Line((-5.425, -29), (-5.425, -28.5))
            Line((-5.425, -28.5), (-21.25, -28.5))
        make_face()
        Polygon((1.3, -82.325), (1.3, -84.325), (21.25, -84.325), (21.25, -28.5), (19.25, -28.5), (19.25, -82.325), align=None)
    extrude(amount=MIRROR1_2_DEPTH)

    # Mirror1 3 outline → Mirror1 3 (add)
    # profile 1 of 2: a face of its own
    with BuildSketch(Plane.YZ.offset(MIRROR1_START)):
        Polygon((-8.1, -82.325), (-8.1, -84.325), (-5.589027778, -84.325), (-5.400138889, -82.325), align=None)
    # profile 2 of 2: a face of its own
    with BuildSketch(Plane.YZ.offset(MIRROR1_START)):
        with Locations((-12.75, -76.1875)):
            Rectangle(MIRROR1_3_OUTLINE_W, MIRROR1_3_OUTLINE_H)
        with Locations((-12.75, -78.5)):
            Circle(MIRROR1_3_OUTLINE_R, mode=Mode.SUBTRACT)
        with Locations((-12.75, -72)):
            Circle(MIRROR1_3_OUTLINE_R, mode=Mode.SUBTRACT)
    extrude(amount=MIRROR1_3_DEPTH)

    # Mirror1 4 outline → Mirror1 4 (add)
    # profile 1 of 3: a face of its own
    with BuildSketch(Plane.YZ.offset(MIRROR1_START)):
        with BuildLine():
            Line((-5.400138889, -82.325), (-5.589027778, -84.325))
            ThreePointArc((-5.589027778, -84.325), (-3.112667731, -80.217778383), (-2.25, -75.5))
            Line((-2.25, -75.5), (-2.25, -67.5))
            Line((-2.25, -67.5), (-4, -67.5))
            Line((-4, -67.5), (-5.400138889, -82.325))
        make_face()
    # profile 2 of 3: a face of its own
    with BuildSketch(Plane.YZ.offset(MIRROR1_START)):
        with Locations((-12.75, -78.5)):
            Circle(MIRROR1_4_OUTLINE_R)
        with Locations((-12.75, -78.5)):
            Circle(MIRROR1_4_OUTLINE_R_2, mode=Mode.SUBTRACT)
    # profile 3 of 3: a face of its own
    with BuildSketch(Plane.YZ.offset(MIRROR1_START)):
        with Locations((-12.75, -72)):
            Circle(MIRROR1_4_OUTLINE_R)
        with Locations((-12.75, -72)):
            Circle(MIRROR1_4_OUTLINE_R_2, mode=Mode.SUBTRACT)
    extrude(amount=MIRROR1_4_DEPTH)

    # Mirror1 5 outline → Mirror1 5 (add)
    # profile 1 of 2: a face of its own
    with BuildSketch(Plane.YZ.offset(MIRROR1_START_2)):
        with Locations((-12.75, -78.5)):
            Circle(MIRROR1_5_OUTLINE_R)
        with Locations((-12.75, -78.5)):
            Circle(MIRROR1_5_OUTLINE_R_2, mode=Mode.SUBTRACT)
    # profile 2 of 2: a face of its own
    with BuildSketch(Plane.YZ.offset(MIRROR1_START_2)):
        with Locations((-12.75, -72)):
            Circle(MIRROR1_5_OUTLINE_R)
        with Locations((-12.75, -72)):
            Circle(MIRROR1_5_OUTLINE_R_2, mode=Mode.SUBTRACT)
    extrude(amount=MIRROR1_5_DEPTH)

    # Mirror1 6 outline → Mirror1 6 (add)
    with BuildSketch(Plane.YZ.offset(MIRROR1_START_3)):
        Polygon((-8.1, -82.325), (-8.1, -84.325), (-5.589027778, -84.325), (-5.400138889, -82.325), align=None)
    extrude(amount=MIRROR1_6_DEPTH)

    # Mirror1 7 outline → Mirror1 7 (add)
    with BuildSketch(Plane.XY.offset(MIRROR1_START_4)):
        with BuildLine():
            Line((4.2875, -14.75), (2.2875, -14.75))
            Line((2.2875, -14.75), (2.2875, -16.75))
            ThreePointArc((2.2875, -16.75), (2.873286438, -15.335786438), (4.2875, -14.75))
        make_face()
        with BuildLine():
            ThreePointArc((4.2875, -10.75), (2.873286438, -10.164213562), (2.2875, -8.75))
            Line((2.2875, -8.75), (2.2875, -10.75))
            Line((2.2875, -10.75), (4.2875, -10.75))
        make_face()
    extrude(amount=MIRROR1_7_DEPTH)

    # Mirror1 8 outline → Mirror1 8 (add)
    with BuildSketch(Plane.XY.offset(MIRROR1_START_5)):
        Polygon((2.2875, 19.25), (2.2875, 18.25), (4.2875, 19.25), align=None)
    extrude(amount=MIRROR1_8_DEPTH)

    # Sketch6 → Mirror Cut (cut, through all)
    with BuildSketch(Plane.ZY):
        with Locations((1, -0.75)):
            Rectangle(SKETCH6_W, SKETCH6_H)
    extrude(amount=-MIRROR_CUT_DEPTH, mode=Mode.SUBTRACT)

    # Sketch24 → Male Snap (add, symmetric)
    with BuildSketch(Plane.XY.offset(-56.4125)):
        with BuildLine():
            Line((2.2875, -19.25), (17.1875, -19.25))
            Line((17.1875, -19.25), (17.1875, -20.1))
            ThreePointArc((17.1875, -20.1), (17.357231833, -20.4), (17.70180038, -20.409022845))
            Line((17.70180038, -20.409022845), (19.744298548, -19.323007305))
            ThreePointArc((19.744298548, -19.323007305), (20.162685162, -18.383295584), (19.352103778, -17.75))
            Line((19.352103778, -17.75), (15.2875, -17.75))
            Line((15.2875, -17.75), (2.2875, -19.25))
        make_face()
        with BuildLine():
            Line((17.70180038, 20.409022845), (19.744298548, 19.323007305))
            ThreePointArc((19.744298548, 19.323007305), (20.162685162, 18.383295584), (19.352103778, 17.75))
            Line((19.352103778, 17.75), (15.2875, 17.75))
            Line((15.2875, 17.75), (2.2875, 19.25))
            Line((2.2875, 19.25), (17.1875, 19.25))
            Line((17.1875, 19.25), (17.1875, 20.1))
            ThreePointArc((17.1875, 20.1), (17.357231833, 20.4), (17.70180038, 20.409022845))
        make_face()
    extrude(amount=MALE_SNAP_DEPTH, both=True)

    # Sketch34 → Magnet Extrude (add)
    with BuildSketch(Plane(origin=(15.2875, 0, 0), x_dir=(0, 0, -1), z_dir=(1, 0, 0))):
        with Locations((56.4125, -22)):
            Rectangle(SKETCH34_W, SKETCH34_H)
    extrude(amount=-MAGNET_EXTRUDE_DEPTH)

    # Sketch34<5> → Magnet Bottom Cut (cut)
    with BuildSketch(Plane(origin=(15.2875, 0, 0), x_dir=(0, 0, -1), z_dir=(1, 0, 0))):
        with Locations((38.45625, -18.8)):
            Rectangle(SKETCH34_5_W, SKETCH34_5_H)
        Polygon((66.4125, -19.25), (66.4125, -21.25), (84.325, -21.25), (84.325, -18.35), (82.325, -18.35), (82.325, -19.25), align=None)
        with Locations((74.36875, -18.8)):
            Rectangle(SKETCH34_5_W, SKETCH34_5_H)
        Polygon((28.5, -18.35), (28.5, -21.25), (46.4125, -21.25), (46.4125, -19.25), (30.5, -19.25), (30.5, -18.35), align=None)
        with Locations((37.45625, -22)):
            Rectangle(SKETCH34_5_W_2, SKETCH34_5_H_2)
        with Locations((75.36875, -22)):
            Rectangle(SKETCH34_5_W_2, SKETCH34_5_H_2)
    extrude(amount=-MAGNET_BOTTOM_CUT_DEPTH, mode=Mode.SUBTRACT)

    # Sketch36 → Boss-Extrude1 (add)
    with BuildSketch(Plane(origin=(0, 21.25, 0), x_dir=(1, 0, 0), z_dir=(0, 1, 0))):
        with Locations((13.390625, 56.4125)):
            Rectangle(SKETCH36_W, SKETCH36_H)
        with Locations((11.803125, 56.4125)):
            Rectangle(SKETCH36_W, SKETCH36_H)
        with Locations((10.215625, 56.4125)):
            Rectangle(SKETCH36_W, SKETCH36_H)
    extrude(amount=BOSS_EXTRUDE1_DEPTH)

    # Sketch44 → Boss-Extrude5 (add)
    with BuildSketch(Plane(origin=(0, 0, -84.325), x_dir=(-1, 0, 0), z_dir=(0, 0, -1))):
        Polygon((-15.2875, 1.3), (-15.2875, 3.2), (0, 3.2), (0, -9.239027778), (-15.2875, -9.239027778), (-15.2875, -5.589027778), (-2.2875, -5.589027778), (-2.2875, 1.3), align=None)
    extrude(amount=BOSS_EXTRUDE5_DEPTH)

    # Fillet7
    fillet7_edges = [part.edges().sort_by_distance(p)[0] for p in [
        (2.2875, -2.144513889, -87.5),
    ]]
    fillet(fillet7_edges, radius=FILLET7_R)


solid = part.part
